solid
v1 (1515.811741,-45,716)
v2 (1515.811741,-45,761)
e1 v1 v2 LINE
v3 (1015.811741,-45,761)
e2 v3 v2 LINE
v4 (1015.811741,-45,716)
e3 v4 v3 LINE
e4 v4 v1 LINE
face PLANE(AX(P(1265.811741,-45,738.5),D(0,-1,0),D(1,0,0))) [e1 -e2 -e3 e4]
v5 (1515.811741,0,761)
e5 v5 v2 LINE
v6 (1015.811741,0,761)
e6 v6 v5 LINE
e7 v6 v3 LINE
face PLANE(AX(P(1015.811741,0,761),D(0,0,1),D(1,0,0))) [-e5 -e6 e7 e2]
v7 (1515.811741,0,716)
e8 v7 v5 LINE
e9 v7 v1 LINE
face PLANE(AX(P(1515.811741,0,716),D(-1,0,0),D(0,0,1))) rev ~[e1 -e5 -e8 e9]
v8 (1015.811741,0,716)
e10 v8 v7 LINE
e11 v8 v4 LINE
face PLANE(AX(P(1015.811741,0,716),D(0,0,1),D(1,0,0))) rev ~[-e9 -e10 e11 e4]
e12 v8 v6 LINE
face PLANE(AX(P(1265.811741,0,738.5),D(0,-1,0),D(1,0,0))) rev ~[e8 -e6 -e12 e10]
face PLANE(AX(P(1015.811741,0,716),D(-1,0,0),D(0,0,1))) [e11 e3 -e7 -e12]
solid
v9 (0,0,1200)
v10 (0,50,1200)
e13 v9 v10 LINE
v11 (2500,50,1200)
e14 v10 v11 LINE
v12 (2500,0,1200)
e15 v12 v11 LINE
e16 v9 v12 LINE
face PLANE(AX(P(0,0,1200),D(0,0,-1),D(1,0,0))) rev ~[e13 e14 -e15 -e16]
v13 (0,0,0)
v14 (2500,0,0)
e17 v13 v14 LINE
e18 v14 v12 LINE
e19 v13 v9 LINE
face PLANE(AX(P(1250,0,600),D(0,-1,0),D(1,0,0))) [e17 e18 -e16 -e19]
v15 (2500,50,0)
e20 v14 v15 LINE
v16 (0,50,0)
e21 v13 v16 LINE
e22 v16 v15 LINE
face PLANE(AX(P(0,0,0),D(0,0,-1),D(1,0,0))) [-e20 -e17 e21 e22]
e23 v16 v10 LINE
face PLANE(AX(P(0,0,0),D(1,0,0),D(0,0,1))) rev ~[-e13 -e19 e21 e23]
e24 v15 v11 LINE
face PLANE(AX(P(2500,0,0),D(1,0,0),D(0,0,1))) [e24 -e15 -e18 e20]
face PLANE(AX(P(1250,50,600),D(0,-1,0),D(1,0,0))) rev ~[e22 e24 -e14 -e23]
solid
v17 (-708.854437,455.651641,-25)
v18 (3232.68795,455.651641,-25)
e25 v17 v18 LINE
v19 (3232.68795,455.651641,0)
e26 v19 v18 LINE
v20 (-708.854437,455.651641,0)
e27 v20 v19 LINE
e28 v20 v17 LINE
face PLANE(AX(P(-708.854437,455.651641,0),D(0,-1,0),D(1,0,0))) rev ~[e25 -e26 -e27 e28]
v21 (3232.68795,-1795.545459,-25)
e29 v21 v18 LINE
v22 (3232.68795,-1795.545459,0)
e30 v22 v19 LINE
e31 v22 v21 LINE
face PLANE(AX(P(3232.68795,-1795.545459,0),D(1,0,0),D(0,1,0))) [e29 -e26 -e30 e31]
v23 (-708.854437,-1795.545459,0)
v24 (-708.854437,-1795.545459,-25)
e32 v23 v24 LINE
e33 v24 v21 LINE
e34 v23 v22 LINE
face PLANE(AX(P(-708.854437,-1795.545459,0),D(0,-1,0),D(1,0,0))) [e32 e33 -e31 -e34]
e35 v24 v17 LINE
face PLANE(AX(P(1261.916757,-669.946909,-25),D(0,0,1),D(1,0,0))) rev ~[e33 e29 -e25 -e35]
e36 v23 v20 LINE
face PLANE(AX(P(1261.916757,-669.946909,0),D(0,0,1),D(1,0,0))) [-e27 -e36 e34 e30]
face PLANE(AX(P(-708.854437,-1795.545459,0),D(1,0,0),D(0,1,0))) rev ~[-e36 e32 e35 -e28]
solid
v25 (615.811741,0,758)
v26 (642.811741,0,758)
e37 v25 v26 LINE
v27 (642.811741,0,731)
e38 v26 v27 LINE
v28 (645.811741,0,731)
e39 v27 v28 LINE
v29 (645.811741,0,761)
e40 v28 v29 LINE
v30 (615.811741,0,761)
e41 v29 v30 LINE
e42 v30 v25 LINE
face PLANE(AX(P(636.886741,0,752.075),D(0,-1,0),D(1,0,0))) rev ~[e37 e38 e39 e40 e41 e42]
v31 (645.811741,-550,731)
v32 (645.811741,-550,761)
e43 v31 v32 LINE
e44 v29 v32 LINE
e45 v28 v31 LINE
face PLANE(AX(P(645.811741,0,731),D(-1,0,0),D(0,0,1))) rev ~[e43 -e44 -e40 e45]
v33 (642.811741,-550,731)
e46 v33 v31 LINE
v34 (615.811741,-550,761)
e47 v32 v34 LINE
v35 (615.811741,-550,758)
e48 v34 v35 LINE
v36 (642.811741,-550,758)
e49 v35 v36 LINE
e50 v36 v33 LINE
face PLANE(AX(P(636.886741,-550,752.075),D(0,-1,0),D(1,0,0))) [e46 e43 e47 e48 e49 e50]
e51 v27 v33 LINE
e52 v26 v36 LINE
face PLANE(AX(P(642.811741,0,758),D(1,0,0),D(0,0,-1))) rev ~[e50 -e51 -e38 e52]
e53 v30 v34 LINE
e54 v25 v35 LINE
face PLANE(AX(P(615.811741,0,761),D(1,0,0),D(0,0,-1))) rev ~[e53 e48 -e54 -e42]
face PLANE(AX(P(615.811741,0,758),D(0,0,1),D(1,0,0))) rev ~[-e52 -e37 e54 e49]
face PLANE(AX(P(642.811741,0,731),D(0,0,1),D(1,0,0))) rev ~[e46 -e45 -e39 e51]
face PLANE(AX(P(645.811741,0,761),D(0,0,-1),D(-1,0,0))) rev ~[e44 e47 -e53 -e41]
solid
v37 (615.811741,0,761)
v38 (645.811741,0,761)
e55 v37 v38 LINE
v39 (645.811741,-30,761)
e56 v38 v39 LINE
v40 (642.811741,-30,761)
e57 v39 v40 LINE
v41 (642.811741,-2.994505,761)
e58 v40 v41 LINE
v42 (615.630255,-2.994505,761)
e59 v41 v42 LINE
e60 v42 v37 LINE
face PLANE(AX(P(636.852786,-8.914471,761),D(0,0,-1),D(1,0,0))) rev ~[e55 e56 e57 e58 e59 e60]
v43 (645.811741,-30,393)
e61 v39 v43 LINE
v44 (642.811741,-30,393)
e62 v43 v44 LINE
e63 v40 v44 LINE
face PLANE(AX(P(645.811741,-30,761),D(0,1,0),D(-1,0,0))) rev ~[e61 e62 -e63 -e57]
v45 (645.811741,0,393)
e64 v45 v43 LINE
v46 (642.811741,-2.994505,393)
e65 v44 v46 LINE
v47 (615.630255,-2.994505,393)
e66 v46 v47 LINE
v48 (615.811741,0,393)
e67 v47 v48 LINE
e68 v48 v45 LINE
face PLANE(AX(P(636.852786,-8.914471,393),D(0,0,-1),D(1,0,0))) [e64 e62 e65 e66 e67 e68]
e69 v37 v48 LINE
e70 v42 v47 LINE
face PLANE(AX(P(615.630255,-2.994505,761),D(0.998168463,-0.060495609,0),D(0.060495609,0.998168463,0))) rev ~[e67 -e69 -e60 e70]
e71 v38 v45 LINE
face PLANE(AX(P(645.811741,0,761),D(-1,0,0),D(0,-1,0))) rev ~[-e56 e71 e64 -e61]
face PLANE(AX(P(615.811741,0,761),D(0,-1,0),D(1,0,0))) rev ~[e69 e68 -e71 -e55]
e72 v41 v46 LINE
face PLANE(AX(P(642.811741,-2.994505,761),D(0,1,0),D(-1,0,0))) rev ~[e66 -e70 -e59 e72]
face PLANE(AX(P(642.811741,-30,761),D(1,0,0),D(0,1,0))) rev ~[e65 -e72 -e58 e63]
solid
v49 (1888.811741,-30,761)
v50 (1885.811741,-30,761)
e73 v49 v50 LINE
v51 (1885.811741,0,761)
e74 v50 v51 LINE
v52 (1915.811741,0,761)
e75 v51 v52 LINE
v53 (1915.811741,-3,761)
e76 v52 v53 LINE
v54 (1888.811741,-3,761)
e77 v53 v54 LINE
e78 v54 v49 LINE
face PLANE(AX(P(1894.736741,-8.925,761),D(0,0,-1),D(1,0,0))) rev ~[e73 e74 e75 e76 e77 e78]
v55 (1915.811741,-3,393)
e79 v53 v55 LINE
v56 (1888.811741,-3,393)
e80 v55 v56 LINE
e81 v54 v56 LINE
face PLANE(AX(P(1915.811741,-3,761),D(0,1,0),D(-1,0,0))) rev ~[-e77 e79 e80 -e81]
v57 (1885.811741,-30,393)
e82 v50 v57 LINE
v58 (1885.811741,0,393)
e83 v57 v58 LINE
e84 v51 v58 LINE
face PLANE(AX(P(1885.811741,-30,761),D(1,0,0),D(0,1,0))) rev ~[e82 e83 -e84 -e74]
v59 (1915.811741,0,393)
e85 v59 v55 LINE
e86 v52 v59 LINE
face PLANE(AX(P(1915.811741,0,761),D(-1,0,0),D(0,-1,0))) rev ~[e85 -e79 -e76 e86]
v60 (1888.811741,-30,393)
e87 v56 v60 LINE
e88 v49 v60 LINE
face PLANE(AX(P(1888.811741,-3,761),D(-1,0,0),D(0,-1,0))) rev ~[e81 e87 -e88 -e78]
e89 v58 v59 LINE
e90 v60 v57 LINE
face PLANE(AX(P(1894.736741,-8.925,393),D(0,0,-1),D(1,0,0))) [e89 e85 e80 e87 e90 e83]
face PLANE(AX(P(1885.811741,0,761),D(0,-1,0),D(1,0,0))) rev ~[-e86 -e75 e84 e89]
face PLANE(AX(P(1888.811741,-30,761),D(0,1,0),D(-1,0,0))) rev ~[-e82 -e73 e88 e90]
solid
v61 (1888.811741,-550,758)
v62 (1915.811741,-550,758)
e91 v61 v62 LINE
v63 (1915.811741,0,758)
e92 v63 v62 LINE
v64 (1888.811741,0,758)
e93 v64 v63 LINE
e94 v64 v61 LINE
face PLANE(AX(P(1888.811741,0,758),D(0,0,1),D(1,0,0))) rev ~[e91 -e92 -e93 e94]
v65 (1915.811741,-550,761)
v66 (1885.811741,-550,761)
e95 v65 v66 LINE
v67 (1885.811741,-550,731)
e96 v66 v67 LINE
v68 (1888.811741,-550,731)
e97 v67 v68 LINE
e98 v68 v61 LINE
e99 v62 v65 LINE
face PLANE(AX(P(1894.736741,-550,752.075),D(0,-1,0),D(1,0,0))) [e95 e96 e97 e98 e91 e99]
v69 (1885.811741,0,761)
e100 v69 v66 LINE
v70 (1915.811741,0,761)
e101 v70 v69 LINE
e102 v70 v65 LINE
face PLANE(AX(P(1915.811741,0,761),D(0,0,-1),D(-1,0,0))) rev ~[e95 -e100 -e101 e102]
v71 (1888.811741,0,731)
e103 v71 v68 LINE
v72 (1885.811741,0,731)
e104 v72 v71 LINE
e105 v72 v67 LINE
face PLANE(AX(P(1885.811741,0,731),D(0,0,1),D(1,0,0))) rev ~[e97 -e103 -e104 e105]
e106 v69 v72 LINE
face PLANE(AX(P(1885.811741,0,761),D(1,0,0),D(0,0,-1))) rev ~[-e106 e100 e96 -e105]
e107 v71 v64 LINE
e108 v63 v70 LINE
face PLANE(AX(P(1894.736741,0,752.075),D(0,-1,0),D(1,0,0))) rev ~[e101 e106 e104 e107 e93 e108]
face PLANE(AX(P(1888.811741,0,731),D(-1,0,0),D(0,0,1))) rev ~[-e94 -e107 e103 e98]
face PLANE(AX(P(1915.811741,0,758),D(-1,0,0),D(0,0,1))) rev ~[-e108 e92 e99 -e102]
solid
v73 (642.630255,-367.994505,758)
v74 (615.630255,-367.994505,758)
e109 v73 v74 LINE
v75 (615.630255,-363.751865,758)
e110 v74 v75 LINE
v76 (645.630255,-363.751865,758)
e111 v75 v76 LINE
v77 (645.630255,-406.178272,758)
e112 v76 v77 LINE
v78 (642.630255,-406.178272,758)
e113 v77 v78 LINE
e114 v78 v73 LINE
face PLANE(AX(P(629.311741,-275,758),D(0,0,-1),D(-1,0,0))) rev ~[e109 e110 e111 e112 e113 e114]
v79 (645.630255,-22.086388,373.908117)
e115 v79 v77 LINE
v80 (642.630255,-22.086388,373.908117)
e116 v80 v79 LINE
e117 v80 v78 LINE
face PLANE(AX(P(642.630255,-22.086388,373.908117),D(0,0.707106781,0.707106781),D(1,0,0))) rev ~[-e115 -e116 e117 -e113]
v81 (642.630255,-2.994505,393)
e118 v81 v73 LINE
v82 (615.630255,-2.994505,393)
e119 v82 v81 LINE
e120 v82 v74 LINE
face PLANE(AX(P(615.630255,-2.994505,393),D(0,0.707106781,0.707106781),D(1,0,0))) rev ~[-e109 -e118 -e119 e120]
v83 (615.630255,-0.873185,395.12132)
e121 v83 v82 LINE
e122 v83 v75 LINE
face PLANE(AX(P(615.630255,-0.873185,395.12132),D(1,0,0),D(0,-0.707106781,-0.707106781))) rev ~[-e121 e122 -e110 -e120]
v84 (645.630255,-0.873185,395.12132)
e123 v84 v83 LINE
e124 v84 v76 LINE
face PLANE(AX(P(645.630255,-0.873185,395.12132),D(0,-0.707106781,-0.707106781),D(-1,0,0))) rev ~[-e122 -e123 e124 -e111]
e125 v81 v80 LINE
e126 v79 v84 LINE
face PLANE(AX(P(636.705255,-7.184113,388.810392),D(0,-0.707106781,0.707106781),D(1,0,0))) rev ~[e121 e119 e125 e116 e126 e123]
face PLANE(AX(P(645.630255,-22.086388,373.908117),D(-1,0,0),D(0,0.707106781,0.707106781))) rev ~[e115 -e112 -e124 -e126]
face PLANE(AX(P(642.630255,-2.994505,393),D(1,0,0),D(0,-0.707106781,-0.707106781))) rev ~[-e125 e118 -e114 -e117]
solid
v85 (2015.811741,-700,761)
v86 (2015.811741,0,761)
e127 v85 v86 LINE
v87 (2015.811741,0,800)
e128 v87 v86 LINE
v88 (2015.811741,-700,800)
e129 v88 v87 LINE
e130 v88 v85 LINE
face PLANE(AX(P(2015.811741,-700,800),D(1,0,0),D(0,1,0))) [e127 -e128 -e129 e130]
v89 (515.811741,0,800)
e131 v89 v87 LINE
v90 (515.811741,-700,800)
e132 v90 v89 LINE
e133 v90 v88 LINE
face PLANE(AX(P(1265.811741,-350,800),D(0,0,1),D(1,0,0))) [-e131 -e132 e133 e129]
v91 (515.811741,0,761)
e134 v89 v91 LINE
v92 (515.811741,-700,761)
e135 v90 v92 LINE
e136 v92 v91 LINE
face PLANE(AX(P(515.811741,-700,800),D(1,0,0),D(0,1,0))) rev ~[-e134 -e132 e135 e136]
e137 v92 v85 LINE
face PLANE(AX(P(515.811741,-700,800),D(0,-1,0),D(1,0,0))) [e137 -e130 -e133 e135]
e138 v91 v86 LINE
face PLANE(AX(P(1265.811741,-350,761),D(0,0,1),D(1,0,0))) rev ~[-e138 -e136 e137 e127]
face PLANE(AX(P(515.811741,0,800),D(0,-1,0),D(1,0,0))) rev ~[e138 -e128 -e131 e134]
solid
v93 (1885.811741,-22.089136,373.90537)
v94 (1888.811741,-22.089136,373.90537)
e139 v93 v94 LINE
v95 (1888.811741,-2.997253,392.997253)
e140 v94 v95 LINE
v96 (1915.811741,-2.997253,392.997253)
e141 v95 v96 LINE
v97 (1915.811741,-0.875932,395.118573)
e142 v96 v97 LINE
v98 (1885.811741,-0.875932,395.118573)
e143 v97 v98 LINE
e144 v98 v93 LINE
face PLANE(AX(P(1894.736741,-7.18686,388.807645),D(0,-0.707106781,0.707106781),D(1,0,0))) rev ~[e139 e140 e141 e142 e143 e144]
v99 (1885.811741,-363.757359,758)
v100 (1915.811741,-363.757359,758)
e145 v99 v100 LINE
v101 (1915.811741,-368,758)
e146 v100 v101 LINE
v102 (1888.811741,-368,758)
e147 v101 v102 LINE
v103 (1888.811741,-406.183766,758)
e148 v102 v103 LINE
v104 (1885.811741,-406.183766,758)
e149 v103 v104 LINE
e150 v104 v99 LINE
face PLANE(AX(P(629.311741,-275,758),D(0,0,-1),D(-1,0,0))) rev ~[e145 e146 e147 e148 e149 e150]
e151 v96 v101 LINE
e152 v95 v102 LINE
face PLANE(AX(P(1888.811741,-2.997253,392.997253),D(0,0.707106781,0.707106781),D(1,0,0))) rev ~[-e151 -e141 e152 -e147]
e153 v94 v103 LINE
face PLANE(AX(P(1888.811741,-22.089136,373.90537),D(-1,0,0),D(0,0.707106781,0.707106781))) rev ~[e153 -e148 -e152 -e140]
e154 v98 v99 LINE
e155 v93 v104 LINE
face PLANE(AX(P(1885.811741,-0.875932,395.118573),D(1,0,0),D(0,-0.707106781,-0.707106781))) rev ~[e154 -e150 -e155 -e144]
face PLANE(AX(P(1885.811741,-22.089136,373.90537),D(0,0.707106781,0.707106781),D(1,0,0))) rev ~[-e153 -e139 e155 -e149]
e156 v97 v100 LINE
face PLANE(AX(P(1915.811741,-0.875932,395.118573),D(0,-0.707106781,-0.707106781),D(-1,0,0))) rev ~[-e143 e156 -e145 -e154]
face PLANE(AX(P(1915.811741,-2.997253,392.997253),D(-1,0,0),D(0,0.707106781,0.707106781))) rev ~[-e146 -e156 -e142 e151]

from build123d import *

# Parameters (mm, degrees)
F0_W      = 2500
F0_H      = 1200
F1_DEPTH  = 50
F2_W      = 3941.5423870087
F2_H      = 2251.1970996857
F3_DEPTH  = 25
F5_W      = 1500
F5_H      = 700
F6_DEPTH  = 39
F7_W      = 500
F7_H      = 45
F8_DEPTH  = 45
F10_DEPTH = 550
F12_DEPTH = 368
F15_REACH = 1880.5875140627


with BuildPart() as f1:
    # F0 (on Front) → F1 (new body)
    with BuildSketch(Plane.XZ):
        with Locations((1250, 600)):
            Rectangle(F0_W, F0_H)
    extrude(amount=-F1_DEPTH)


with BuildPart() as f3:
    # F2 (on Top) → F3 (new body)
    with BuildSketch(Plane.XY):
        with Locations((1261.9167566299, -669.9469089508)):
            Rectangle(F2_W, F2_H)
    extrude(amount=-F3_DEPTH)


with BuildPart() as f6:
    # F5 (on offset) → F6 (new body)
    with BuildSketch(Plane.XY.offset(800)):
        with Locations((1265.8117413521, -350)):
            Rectangle(F5_W, F5_H)
    extrude(amount=-F6_DEPTH)


with BuildPart() as f8:
    # F7 (on face) → F8 (new body)
    with BuildSketch(Plane.XZ):
        with Locations((1265.8117413521, 738.5)):
            Rectangle(F7_W, F7_H)
    extrude(amount=F8_DEPTH)


with BuildPart() as f10:
    # F9 (on face) → F10 (new body)
    with BuildSketch(Plane.XZ):
        Polygon((645.8117413521, 761), (615.8117413521, 761), (615.8117413521, 758), (642.8117413521, 758), (642.8117413521, 731), (645.8117413521, 731), align=None)
    extrude(amount=F10_DEPTH)


with BuildPart() as f10b:
    # F9 (on face) → F10, piece 2 (new body)
    with BuildSketch(Plane.XZ):
        Polygon((1915.8117413521, 758), (1915.8117413521, 761), (1885.8117413521, 761), (1885.8117413521, 731), (1888.8117413521, 731), (1888.8117413521, 758), align=None)
    extrude(amount=F10_DEPTH)


with BuildPart() as f12:
    # F11 (on face) → F12 (new body)
    with BuildSketch(Plane(origin=(0, 0, 761), x_dir=(1, 0, 0), z_dir=(0, 0, -1))):
        Polygon((615.6302545255, 2.9945053902), (615.8117413521, 0), (645.8117413521, 0), (645.8117413521, 30), (642.8117413521, 30), (642.8117413521, 2.9945053902), align=None)
    extrude(amount=F12_DEPTH)


with BuildPart() as f12b:
    # F11 (on face) → F12, piece 2 (new body)
    with BuildSketch(Plane(origin=(0, 0, 761), x_dir=(1, 0, 0), z_dir=(0, 0, -1))):
        Polygon((1888.8117413521, 30), (1885.8117413521, 30), (1885.8117413521, 0), (1915.8117413521, 0), (1915.8117413521, 3), (1888.8117413521, 3), align=None)
    extrude(amount=F12_DEPTH)


with BuildPart() as f15:
    f15_end = Plane(origin=(629.3117413521, -275, 758), x_dir=(-1, 0, 0), z_dir=(0, 0, -1))
    # F14 (on face) → F15 (new body, up to a plane its end follows)
    with BuildSketch(Plane(origin=(0, -197.9972526951, 197.9972526951), x_dir=(1, 0, 0), z_dir=(0, -0.7071067812, 0.7071067812))):
        Polygon((642.6302545255, 248.7755299386), (645.6302545255, 248.7755299386), (645.6302545255, 278.7755299386), (615.6302545255, 278.7755299386), (615.6302545255, 275.7755299386), (642.6302545255, 275.7755299386), align=None)
    f15_long = extrude(amount=F15_REACH, mode=Mode.PRIVATE)
    add(split(f15_long, bisect_by=f15_end, keep=Keep.TOP, mode=Mode.PRIVATE))


with BuildPart() as f15b:
    f15_2_end = Plane(origin=(629.3117413521, -275, 758), x_dir=(-1, 0, 0), z_dir=(0, 0, -1))
    # F14 (on face) → F15, piece 2 (new body, up to a plane its end follows)
    with BuildSketch(Plane(origin=(0, -197.9972526951, 197.9972526951), x_dir=(1, 0, 0), z_dir=(0, -0.7071067812, 0.7071067812))):
        Polygon((1915.8117413521, 275.7716446628), (1915.8117413521, 278.7716446628), (1885.8117413521, 278.7716446628), (1885.8117413521, 248.7716446628), (1888.8117413521, 248.7716446628), (1888.8117413521, 275.7716446628), align=None)
    f15_2_long = extrude(amount=F15_REACH, mode=Mode.PRIVATE)
    add(split(f15_2_long, bisect_by=f15_2_end, keep=Keep.TOP, mode=Mode.PRIVATE))


solid = Compound([f1.part, f3.part, f6.part, f8.part, f10.part, f10b.part, f12.part, f12b.part, f15.part, f15b.part])
